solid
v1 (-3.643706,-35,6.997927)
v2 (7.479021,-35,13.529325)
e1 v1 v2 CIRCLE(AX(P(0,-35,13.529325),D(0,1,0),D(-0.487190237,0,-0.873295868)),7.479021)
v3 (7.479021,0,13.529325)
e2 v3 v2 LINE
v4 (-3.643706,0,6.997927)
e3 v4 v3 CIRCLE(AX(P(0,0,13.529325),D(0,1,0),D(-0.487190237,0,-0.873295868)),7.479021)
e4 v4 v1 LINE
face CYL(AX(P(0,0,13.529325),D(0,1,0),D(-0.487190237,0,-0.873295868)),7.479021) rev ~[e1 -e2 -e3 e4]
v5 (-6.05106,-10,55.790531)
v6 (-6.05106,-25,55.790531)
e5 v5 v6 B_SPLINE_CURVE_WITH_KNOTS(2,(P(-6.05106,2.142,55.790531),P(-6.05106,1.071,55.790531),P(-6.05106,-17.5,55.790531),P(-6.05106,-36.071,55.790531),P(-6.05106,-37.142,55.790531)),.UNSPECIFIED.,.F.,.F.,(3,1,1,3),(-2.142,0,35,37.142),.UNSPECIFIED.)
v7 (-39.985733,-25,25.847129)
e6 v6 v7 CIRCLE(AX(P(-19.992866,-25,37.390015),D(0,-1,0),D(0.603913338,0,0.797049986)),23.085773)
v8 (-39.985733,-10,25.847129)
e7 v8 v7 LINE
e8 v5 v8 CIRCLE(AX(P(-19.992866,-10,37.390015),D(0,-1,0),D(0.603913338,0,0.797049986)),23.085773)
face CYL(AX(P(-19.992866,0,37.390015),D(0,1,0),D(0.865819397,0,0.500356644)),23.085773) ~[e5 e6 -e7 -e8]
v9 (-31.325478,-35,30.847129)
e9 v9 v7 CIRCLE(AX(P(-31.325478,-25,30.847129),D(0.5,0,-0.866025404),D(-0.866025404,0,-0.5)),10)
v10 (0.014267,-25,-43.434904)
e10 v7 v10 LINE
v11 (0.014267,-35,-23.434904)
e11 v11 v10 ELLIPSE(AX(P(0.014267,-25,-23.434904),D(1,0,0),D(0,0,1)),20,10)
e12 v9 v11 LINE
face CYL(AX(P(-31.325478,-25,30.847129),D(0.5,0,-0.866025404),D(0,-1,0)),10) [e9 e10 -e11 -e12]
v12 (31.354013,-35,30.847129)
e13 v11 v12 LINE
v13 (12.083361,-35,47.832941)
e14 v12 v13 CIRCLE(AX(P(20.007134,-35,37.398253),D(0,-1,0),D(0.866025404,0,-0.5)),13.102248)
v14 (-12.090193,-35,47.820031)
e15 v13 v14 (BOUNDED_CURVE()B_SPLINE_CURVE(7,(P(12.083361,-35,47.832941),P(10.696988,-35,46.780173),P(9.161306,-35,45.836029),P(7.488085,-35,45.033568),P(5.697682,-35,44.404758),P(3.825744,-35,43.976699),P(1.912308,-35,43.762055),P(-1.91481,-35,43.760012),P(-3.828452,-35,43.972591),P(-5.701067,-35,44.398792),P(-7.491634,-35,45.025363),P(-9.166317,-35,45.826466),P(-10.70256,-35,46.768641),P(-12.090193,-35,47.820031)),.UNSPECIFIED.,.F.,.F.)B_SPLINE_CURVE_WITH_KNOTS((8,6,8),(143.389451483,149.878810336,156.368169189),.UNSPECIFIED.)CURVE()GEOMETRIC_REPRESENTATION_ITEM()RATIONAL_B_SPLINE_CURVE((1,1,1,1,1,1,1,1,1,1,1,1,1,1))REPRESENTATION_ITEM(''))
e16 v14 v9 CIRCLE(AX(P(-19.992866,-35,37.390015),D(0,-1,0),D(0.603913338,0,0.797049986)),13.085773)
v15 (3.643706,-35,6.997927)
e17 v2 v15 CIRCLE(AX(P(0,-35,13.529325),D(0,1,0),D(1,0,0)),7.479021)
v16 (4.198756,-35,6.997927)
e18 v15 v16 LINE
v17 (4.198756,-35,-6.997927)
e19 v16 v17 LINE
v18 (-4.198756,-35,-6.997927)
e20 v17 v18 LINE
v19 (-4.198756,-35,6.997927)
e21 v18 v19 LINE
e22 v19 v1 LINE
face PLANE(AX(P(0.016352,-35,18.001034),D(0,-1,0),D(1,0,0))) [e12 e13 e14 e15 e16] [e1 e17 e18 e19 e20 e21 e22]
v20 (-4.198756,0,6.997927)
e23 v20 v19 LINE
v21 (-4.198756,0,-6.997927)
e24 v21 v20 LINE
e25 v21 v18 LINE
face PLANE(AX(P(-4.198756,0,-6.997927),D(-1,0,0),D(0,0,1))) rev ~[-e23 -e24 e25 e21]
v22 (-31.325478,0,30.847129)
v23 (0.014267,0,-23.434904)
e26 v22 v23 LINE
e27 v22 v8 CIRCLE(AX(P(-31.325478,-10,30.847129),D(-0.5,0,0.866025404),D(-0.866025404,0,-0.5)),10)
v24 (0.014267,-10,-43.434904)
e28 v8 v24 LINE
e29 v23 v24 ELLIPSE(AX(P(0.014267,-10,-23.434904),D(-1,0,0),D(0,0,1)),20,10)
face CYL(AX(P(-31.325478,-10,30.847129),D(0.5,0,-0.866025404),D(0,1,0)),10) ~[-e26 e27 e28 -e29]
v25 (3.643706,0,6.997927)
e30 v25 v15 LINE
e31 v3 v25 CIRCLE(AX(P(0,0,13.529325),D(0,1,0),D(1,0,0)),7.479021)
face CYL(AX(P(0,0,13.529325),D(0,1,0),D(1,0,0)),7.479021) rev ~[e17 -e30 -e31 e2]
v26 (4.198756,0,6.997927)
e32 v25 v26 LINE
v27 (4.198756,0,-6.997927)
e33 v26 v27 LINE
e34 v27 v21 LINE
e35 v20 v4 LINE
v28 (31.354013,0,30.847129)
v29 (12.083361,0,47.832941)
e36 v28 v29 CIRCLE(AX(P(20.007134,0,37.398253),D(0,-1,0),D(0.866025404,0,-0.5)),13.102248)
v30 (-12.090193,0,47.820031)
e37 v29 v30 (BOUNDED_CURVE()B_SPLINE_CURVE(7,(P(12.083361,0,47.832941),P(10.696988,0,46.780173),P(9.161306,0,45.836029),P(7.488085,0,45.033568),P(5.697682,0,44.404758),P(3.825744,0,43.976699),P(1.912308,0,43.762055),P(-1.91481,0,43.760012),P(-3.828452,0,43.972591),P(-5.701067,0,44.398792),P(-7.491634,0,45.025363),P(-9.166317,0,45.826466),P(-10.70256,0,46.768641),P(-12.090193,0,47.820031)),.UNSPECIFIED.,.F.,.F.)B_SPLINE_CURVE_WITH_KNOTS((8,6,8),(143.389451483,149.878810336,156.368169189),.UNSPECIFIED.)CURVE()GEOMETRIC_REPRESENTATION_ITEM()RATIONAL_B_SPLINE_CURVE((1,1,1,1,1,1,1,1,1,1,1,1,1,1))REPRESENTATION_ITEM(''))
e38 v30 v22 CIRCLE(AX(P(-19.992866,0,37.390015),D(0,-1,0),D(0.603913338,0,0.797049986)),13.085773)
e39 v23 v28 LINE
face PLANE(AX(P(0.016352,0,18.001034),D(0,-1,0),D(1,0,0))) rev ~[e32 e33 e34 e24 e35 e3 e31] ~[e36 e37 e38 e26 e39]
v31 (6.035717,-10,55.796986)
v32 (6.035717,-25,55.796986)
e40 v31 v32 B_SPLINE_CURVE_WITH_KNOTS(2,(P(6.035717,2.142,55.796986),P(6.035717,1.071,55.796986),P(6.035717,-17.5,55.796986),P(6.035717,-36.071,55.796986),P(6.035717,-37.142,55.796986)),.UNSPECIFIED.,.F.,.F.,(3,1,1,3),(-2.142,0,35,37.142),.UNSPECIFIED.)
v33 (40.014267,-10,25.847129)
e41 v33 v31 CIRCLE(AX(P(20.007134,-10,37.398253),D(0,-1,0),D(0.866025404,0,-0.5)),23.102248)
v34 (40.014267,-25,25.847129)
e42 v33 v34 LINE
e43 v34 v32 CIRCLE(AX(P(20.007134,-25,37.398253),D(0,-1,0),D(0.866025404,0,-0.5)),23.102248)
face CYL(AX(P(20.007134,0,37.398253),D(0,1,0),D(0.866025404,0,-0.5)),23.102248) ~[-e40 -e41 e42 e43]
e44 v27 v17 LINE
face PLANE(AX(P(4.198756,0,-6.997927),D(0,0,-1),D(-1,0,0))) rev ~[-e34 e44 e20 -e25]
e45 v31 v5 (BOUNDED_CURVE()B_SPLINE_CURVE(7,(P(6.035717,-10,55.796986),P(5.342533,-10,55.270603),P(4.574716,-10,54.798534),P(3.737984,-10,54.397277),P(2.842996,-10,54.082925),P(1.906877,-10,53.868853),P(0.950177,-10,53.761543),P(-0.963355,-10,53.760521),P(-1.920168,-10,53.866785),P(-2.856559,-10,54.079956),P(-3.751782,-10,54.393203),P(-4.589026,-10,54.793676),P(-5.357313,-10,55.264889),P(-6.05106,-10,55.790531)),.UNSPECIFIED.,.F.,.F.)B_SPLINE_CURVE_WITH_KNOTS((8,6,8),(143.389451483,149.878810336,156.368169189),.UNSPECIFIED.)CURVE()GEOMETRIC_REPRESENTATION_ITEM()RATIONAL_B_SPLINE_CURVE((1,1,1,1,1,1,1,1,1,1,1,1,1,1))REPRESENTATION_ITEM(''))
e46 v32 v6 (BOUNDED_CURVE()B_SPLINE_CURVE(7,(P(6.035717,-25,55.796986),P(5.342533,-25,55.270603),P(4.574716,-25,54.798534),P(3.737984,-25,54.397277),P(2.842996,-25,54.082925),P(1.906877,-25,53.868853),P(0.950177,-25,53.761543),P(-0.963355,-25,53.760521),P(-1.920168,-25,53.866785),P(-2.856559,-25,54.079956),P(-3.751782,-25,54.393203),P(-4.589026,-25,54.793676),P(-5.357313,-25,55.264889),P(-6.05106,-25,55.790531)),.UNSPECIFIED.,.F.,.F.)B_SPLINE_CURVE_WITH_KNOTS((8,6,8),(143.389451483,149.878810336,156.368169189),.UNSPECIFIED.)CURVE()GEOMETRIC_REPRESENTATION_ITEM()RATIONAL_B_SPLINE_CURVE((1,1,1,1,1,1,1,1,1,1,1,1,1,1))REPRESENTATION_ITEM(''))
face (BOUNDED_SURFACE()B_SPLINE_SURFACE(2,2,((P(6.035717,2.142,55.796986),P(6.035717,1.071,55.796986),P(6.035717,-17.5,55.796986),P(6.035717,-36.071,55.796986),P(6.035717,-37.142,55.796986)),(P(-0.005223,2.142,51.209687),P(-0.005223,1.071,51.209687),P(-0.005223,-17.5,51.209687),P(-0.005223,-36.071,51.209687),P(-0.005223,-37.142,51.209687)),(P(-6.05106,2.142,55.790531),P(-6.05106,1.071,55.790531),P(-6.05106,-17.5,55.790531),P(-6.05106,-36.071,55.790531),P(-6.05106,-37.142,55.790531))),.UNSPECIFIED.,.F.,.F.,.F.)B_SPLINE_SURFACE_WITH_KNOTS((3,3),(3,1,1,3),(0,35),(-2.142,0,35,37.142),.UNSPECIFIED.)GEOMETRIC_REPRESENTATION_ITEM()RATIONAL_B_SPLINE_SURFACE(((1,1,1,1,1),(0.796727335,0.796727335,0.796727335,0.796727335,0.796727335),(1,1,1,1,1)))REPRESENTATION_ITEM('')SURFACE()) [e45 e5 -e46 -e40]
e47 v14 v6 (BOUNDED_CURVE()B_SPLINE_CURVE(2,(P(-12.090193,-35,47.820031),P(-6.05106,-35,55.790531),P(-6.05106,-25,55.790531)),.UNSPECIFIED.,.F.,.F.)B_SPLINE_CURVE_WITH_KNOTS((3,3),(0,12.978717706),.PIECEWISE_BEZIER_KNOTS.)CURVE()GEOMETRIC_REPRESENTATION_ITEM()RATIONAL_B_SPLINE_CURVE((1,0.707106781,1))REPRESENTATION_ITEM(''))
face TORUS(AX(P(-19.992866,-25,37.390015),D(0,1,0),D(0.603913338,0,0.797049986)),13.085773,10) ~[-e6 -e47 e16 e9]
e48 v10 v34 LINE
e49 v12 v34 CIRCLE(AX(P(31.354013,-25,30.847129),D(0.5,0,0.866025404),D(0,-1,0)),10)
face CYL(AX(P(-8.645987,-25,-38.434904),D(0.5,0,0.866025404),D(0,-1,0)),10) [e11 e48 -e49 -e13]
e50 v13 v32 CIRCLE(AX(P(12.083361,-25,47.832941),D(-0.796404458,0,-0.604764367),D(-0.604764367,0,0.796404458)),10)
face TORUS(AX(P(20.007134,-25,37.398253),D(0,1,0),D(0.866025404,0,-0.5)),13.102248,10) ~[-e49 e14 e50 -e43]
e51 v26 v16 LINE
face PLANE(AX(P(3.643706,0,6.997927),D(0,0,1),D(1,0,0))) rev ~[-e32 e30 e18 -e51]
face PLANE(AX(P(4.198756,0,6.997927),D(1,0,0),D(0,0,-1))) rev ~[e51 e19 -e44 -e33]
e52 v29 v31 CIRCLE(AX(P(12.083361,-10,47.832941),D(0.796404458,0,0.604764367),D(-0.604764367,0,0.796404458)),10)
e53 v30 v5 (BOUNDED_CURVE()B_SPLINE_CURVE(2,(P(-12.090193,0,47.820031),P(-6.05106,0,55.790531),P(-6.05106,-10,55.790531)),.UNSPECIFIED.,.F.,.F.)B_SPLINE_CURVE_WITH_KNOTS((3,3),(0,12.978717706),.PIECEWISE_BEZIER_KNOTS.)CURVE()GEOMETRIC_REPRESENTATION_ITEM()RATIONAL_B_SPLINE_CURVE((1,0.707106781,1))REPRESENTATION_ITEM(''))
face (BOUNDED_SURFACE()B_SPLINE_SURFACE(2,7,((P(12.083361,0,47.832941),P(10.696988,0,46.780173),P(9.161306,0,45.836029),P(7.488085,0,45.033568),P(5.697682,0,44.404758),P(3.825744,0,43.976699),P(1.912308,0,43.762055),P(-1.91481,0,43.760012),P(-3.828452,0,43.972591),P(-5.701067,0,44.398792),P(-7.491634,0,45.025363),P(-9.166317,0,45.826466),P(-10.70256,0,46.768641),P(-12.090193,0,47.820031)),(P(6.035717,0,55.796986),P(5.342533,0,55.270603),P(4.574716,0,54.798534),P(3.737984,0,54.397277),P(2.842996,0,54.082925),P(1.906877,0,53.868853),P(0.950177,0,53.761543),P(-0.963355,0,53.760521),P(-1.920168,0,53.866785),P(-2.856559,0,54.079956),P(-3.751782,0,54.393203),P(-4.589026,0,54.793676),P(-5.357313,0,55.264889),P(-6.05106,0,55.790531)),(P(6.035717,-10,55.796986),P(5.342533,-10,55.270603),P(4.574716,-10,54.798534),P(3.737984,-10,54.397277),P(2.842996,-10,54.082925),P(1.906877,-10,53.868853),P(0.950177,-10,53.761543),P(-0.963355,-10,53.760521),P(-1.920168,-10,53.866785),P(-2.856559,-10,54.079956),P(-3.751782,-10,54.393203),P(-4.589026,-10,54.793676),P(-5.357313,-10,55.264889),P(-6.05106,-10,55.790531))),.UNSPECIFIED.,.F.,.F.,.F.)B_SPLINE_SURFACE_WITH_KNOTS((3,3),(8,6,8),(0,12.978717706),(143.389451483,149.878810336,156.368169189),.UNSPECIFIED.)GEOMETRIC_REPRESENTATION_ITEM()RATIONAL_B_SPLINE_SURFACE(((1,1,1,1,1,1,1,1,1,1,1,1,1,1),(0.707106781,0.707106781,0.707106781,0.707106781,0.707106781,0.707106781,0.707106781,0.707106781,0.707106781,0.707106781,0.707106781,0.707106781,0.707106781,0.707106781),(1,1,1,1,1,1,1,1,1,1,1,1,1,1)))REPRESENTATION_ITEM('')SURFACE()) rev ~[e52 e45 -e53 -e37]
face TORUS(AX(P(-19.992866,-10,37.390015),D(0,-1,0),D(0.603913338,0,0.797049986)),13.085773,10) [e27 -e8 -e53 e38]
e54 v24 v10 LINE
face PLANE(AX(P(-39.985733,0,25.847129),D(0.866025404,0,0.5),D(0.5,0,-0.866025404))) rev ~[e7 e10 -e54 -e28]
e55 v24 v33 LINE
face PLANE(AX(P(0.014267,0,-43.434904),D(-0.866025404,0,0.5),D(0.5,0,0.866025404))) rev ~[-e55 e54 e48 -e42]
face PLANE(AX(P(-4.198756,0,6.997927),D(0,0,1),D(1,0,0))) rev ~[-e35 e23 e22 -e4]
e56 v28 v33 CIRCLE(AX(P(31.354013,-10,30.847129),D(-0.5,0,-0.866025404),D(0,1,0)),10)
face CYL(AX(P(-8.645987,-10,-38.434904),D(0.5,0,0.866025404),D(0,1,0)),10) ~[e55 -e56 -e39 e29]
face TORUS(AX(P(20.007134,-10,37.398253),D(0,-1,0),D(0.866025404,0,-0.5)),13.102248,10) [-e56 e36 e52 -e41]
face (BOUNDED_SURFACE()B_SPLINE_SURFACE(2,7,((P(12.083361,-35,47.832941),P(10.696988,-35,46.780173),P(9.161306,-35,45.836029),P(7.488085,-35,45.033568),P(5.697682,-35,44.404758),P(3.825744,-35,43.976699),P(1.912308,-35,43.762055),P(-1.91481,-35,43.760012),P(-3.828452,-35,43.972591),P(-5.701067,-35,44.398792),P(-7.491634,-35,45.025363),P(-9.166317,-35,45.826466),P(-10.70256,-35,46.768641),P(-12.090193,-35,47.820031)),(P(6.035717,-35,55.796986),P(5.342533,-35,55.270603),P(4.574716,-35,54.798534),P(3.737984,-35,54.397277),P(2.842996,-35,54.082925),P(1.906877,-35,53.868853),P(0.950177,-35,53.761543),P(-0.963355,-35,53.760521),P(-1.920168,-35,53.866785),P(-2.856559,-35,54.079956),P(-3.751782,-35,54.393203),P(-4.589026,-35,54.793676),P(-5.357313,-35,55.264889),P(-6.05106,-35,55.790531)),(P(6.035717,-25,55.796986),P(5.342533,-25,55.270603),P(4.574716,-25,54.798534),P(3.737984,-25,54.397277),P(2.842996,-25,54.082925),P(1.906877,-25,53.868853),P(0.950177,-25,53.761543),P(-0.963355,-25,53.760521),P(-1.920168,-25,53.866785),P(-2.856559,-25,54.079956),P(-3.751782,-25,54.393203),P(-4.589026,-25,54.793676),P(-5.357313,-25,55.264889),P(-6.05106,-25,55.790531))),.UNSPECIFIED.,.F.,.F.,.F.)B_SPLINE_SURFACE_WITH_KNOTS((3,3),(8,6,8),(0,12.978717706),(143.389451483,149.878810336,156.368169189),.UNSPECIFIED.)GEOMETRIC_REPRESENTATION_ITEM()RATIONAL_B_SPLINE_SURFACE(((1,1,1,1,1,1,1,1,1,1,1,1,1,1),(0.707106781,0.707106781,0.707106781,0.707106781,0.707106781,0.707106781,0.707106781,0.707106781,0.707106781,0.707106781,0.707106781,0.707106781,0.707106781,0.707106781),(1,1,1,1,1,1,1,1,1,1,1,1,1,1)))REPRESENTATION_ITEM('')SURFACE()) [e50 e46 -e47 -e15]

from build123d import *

# Parameters (mm, degrees)
F1_DEPTH = 35
F2_F1_R  = 10
F2_F2_R  = 10


with BuildPart() as f1:
    # F0 (on Front) → F1 (new body)
    with BuildSketch(Plane.XZ):
        with BuildLine():
            ThreePointArc((-0.0047558207, 48.9411353783), (-31.5398699376, 57.380504031), (-39.9857325354, 25.8471285283))
            Line((-39.9857325354, 25.8471285283), (0.0142674646, -43.4349037745))
            Line((0.0142674646, -43.4349037745), (40.0142674646, 25.8471285283))
            ThreePointArc((40.0142674646, 25.8471285283), (31.5541374022, 57.4077646413), (-0.0047558207, 48.9411353783))
        make_face()
        with BuildLine():
            ThreePointArc((-3.643705829, 6.997927092), (-3.7871096163, 19.9786310917), (7.4790206276, 13.5293249041))
            ThreePointArc((7.4790206276, 13.5293249041), (6.4493061876, 9.7422152878), (3.643705829, 6.997927092))
            Line((3.643705829, 6.997927092), (4.1987560689, 6.997927092))
            Line((4.1987560689, 6.997927092), (4.1987560689, -6.997927092))
            Line((4.1987560689, -6.997927092), (-4.1987560689, -6.997927092))
            Line((-4.1987560689, -6.997927092), (-4.1987560689, 6.997927092))
            Line((-4.1987560689, 6.997927092), (-3.643705829, 6.997927092))
        make_face(mode=Mode.SUBTRACT)
        with BuildLine():
            ThreePointArc((0, 25.8471285283), (-3.0951138699, 37.3934950566), (-0.0047558207, 48.9411353783))
            ThreePointArc((-0.0047558207, 48.9411353783), (3.0929066858, 37.3947693749), (0, 25.8471285283))
        make_face(mode=Mode.SUBTRACT)
        with BuildLine():
            ThreePointArc((0, 25.8471285283), (3.0929066858, 37.3947693749), (-0.0047558207, 48.9411353783))
            ThreePointArc((-0.0047558207, 48.9411353783), (-3.0951138699, 37.3934950566), (0, 25.8471285283))
        make_face()
    extrude(amount=F1_DEPTH)

    # F2: fillet of radius 10 on 4 edges, made by hand

    # F2_f1
    f2_f1_edges = [f1.edges().sort_by_distance(p)[0] for p in [
        (-0.0047558207, -17.5, 48.9411353783),
    ]]
    fillet(f2_f1_edges, radius=F2_F1_R)

    # F2_f2
    f2_f2_edges = [f1.edges().sort_by_distance(p)[0] for p in [
        (-35.2672128577, 0, 54.7003379421),
        (-35.2672128577, -35, 54.7003379421),
        (-19.9857325354, -35, -8.7938876231),
        (-19.9857325354, 0, -8.7938876231),
        (-0.0065856085, -35, 53.761031934),
        (-0.0065856085, 0, 53.761031934),
    ]]
    fillet(f2_f2_edges, radius=F2_F2_R)


solid = f1.part
